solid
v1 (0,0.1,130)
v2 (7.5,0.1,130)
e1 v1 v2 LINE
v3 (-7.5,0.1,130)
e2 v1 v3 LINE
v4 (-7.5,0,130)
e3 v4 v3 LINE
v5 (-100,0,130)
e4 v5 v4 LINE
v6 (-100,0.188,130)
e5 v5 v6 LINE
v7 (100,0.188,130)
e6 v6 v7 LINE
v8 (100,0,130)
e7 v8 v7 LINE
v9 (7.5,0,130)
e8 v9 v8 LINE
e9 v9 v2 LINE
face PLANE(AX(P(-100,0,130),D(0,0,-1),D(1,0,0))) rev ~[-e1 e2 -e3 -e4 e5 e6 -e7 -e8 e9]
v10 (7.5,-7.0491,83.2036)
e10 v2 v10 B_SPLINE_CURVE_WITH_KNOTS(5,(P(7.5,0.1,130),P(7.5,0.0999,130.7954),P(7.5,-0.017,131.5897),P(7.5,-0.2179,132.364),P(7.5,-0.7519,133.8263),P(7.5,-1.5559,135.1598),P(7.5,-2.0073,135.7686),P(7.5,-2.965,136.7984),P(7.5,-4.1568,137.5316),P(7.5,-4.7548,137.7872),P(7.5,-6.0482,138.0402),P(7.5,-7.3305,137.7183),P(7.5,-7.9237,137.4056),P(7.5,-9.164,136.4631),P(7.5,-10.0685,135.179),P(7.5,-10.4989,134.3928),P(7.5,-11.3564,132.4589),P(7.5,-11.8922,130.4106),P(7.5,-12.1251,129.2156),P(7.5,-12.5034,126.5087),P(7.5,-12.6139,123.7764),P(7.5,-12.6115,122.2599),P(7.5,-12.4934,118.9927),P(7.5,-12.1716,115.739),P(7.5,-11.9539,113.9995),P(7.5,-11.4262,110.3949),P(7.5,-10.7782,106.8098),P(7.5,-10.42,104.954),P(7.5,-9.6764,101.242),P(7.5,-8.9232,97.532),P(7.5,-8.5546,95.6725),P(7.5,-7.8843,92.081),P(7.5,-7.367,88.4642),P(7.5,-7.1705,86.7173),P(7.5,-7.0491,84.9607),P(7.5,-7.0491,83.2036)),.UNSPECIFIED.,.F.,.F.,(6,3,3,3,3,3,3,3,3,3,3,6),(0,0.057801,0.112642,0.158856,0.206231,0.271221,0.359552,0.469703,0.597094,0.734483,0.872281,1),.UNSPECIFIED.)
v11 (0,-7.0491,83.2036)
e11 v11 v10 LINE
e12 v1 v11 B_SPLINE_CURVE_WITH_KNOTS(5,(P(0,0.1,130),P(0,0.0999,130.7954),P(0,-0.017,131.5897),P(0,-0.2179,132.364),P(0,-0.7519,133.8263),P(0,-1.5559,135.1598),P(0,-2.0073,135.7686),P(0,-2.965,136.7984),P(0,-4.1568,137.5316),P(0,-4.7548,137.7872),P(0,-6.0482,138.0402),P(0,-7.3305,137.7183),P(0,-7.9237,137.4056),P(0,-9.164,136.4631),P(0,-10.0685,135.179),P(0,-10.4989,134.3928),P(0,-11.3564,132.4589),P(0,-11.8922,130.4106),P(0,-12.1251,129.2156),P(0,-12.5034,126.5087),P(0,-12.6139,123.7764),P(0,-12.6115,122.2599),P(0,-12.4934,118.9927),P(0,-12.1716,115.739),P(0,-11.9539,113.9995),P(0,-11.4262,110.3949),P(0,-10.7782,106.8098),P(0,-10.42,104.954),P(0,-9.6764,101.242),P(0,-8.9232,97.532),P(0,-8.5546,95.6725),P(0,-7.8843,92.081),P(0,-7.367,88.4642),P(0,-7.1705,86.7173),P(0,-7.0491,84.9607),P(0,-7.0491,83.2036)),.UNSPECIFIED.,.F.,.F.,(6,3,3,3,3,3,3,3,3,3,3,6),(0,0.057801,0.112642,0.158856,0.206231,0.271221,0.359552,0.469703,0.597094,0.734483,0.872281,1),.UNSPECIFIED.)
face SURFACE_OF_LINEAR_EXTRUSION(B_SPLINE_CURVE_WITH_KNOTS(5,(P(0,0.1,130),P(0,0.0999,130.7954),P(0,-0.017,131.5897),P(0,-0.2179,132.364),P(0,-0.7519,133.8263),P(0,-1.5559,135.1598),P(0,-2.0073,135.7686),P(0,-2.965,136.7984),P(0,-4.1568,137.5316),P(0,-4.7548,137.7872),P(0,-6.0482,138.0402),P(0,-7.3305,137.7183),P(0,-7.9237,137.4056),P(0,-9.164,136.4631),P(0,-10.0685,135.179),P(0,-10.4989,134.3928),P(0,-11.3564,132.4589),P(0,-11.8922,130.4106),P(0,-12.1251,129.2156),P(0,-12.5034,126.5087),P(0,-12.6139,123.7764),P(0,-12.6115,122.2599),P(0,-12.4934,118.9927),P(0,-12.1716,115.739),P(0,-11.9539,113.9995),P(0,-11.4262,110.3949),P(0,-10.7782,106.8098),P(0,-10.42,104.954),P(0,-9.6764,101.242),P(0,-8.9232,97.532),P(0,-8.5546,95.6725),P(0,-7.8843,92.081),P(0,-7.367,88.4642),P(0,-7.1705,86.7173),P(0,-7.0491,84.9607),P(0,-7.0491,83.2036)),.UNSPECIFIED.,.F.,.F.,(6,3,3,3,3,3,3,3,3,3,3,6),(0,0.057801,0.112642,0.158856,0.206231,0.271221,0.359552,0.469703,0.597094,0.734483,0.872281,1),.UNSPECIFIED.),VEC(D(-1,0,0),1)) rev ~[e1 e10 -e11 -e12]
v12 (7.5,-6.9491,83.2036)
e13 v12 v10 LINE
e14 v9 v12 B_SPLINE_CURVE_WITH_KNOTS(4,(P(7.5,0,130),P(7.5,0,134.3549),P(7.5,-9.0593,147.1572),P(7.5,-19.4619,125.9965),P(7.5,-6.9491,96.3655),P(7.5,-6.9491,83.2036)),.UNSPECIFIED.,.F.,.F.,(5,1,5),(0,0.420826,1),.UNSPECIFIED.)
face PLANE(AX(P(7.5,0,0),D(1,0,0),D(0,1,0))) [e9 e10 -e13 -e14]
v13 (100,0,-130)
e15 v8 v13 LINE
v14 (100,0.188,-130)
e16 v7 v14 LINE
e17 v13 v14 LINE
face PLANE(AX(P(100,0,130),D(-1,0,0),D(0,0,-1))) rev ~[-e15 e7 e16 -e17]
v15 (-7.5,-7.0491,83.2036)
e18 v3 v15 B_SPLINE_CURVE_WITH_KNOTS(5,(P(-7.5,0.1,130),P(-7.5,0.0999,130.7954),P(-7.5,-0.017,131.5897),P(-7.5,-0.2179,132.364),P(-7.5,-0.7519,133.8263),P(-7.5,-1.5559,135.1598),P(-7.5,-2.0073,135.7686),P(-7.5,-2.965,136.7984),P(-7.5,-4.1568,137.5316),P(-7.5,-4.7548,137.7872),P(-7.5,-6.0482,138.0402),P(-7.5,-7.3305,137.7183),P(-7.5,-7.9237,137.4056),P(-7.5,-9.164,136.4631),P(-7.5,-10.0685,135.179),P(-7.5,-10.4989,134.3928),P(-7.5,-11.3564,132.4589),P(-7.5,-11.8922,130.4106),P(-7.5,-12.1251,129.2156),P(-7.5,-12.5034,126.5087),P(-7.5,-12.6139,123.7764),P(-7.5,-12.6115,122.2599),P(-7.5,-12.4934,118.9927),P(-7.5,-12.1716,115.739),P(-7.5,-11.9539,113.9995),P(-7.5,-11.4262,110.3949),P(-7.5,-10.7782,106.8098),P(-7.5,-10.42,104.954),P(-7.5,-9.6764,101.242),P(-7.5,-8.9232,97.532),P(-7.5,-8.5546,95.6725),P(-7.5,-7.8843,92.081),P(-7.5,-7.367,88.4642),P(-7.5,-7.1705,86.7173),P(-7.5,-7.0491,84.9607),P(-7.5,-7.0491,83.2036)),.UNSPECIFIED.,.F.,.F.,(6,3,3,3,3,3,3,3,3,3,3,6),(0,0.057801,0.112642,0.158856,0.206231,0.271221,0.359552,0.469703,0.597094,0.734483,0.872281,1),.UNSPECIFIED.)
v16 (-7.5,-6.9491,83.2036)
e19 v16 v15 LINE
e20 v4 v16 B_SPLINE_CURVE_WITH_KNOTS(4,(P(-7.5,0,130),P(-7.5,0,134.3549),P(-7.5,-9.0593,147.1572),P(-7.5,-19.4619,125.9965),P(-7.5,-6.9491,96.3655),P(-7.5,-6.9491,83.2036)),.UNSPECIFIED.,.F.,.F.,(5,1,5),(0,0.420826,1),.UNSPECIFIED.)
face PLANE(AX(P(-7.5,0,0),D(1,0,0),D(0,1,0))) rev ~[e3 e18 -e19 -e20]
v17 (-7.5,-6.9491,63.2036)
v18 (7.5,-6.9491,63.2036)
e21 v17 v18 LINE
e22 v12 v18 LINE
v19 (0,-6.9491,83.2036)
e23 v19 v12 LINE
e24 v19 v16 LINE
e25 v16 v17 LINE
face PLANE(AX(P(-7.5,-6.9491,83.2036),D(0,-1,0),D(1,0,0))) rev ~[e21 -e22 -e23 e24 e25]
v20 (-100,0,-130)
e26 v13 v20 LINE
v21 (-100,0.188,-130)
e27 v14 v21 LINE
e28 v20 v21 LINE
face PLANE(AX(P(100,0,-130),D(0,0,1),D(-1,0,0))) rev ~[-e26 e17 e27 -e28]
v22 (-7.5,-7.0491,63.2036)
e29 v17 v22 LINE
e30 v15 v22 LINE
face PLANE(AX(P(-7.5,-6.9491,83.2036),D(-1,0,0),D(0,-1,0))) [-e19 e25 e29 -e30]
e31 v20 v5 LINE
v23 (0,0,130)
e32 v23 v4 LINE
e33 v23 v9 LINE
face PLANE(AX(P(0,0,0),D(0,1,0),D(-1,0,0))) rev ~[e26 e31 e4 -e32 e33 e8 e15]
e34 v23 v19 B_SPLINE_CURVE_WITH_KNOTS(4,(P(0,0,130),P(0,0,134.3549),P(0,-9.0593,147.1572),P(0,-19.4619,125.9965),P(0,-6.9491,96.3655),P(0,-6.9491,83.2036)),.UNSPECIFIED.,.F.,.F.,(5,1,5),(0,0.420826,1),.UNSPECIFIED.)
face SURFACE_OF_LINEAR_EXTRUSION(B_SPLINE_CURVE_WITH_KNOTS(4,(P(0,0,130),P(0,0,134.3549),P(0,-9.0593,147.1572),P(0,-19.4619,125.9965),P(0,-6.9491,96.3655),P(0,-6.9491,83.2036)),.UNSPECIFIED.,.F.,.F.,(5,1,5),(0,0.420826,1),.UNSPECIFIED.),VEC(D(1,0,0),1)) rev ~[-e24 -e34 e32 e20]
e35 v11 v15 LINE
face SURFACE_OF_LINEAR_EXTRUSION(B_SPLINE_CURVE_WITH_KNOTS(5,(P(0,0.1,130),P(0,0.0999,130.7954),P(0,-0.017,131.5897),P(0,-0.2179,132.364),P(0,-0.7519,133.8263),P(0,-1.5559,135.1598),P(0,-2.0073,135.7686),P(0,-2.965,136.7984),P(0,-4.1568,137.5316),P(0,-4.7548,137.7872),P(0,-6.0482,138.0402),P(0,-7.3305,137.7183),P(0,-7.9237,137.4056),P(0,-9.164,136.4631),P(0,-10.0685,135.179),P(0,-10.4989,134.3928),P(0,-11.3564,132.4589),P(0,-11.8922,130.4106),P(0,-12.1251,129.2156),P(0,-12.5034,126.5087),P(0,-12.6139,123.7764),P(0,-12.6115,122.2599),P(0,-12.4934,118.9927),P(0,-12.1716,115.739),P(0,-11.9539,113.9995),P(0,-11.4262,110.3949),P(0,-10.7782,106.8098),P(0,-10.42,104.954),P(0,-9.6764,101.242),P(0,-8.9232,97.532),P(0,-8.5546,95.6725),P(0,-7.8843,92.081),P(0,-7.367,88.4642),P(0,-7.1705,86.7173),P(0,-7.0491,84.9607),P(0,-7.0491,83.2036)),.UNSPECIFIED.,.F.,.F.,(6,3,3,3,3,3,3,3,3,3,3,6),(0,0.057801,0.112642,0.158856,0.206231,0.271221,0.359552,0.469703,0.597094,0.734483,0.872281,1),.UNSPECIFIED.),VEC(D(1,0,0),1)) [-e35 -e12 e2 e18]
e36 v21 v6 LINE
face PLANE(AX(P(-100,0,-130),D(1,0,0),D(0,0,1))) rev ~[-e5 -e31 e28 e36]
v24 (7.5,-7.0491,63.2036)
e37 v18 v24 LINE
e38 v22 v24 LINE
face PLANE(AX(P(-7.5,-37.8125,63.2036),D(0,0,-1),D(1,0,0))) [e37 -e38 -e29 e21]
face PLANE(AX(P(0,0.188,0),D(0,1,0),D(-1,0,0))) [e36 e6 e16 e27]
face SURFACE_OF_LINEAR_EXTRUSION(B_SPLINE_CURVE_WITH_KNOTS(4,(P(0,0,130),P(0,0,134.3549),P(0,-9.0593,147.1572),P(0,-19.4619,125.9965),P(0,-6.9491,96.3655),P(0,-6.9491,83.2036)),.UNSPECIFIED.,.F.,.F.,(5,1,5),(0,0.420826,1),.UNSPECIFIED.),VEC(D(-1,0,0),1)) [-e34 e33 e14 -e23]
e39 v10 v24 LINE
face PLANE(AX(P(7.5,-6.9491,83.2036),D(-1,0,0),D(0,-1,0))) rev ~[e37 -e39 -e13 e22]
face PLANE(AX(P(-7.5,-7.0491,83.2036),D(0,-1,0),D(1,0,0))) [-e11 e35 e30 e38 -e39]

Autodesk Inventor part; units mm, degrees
ref_plane "YZ Plane" through (0, 0, 0) normal (1, 0, 0) x (0, 1, 0)
ref_plane "XZ Plane" through (0, 0, 0) normal (0, 1, 0) x (-1, 0, 0)
sketch "Sketch1" plane through (0, 0, 0) normal (0, 1, 0) x (-1, 0, 0)
  line L0 (100, 130) -> (-100, 130)
  line L1 (-100, 130) -> (-100, -130)
  line L2 (-100, -130) -> (100, -130)
  line L3 (100, -130) -> (100, 130)
  line L4 (100, 130) -> (-100, -130) construction
  line L5 (-100, 130) -> (100, -130) construction
  point P0 (0, 0)
  dimension "d0" = 200
  dimension "d1" = 260
extrude "Extrusion1" add sketch "Sketch1" along normal blind 0.188
sketch "Sketch10" plane through (0, 0.188, 0) normal (0, 1, 0) x (1, 0, 0)
  line L0 (98.0274, 130) -> (98.0274, -130) construction
  line L1 (98.0274, -130) -> (-100, -130) construction
  line L2 (-100, -130) -> (-100, 130) construction
  line L3 (-100, 130) -> (98.0274, 130) construction
  point P0 (0, 0)
decal "Decal6"
sketch "Sketch9" plane through (0, 0.188, 0) normal (0, 1, 0) x (1, 0, 0)
  line L0 (-9.9844, -128.5553) -> (-9.9844, -122.1467) construction
  line L1 (-9.9844, -122.1467) -> (9.7409, -122.1467) construction
  line L2 (9.7409, -122.1467) -> (9.7409, -128.5553) construction
  line L3 (9.7409, -128.5553) -> (-9.9844, -128.5553) construction
  point P0 (0, 0)
decal "Decal5"
sketch "Sketch2" plane through (0, 0, 0) normal (1, 0, 0) x (0, 1, 0)
  line L0 (0.188, 130) -> (0.188, -130) projected
  line L1 (0, 90.3171) -> (0, 130) construction
  spline S0 degree 4 poles (0, 130) (0, 134.3549) (-9.0593, 147.1572) (-19.4619, 125.9965) (-6.9491, 96.3655) (-6.9491, 83.2036) knots 0 0 0 0 0 0.420826 1 1 1 1 1
  line L2 (0, 130) -> (0, 216.7) construction
  line L3 (-6.9491, 83.2036) -> (-6.9491, 68.2036) construction
  point P0 (0, 0)
  point P1 (-4.7518, 137.6005)
  point P2 (-10.9891, 132.9269)
  dimension "d4" = 86.7
  dimension "d10" = 15
sketch "Sketch3" plane through (0, 0, 0) normal (1, 0, 0) x (0, 1, 0)
  spline S0 degree 4 poles (0, 130) (0, 134.3549) (-9.0593, 147.1572) (-19.4619, 125.9965) (-6.9491, 96.3655) (-6.9491, 83.2036) knots 0 0 0 0 0 0.420826 1 1 1 1 1 projected
  line L0 (0, 130) -> (0, -130) projected
  line L1 (0, 130) -> (0.1, 130)
  line L2 (0, 130) -> (0.188, 130) projected
  line L3 (-6.9491, 83.2036) -> (-7.0491, 83.2036)
  spline S1 degree 5 poles (0.1, 130) (0.0999, 130.7954) (-0.017, 131.5897) (-0.2179, 132.364) (-0.7519, 133.8263) (-1.5559, 135.1598) (-2.0073, 135.7686) (-2.965, 136.7984) (-4.1568, 137.5316) (-4.7548, 137.7872) (-6.0482, 138.0402) (-7.3305, 137.7183) (-7.9237, 137.4056) (-9.164, 136.4631) (-10.0685, 135.179) (-10.4989, 134.3928) (-11.3564, 132.4589) (-11.8922, 130.4106) (-12.1251, 129.2156) (-12.5034, 126.5087) (-12.6139, 123.7764) (-12.6115, 122.2599) (-12.4934, 118.9927) (-12.1716, 115.739) (-11.9539, 113.9995) (-11.4262, 110.3949) (-10.7782, 106.8098) (-10.42, 104.954) (-9.6764, 101.242) (-8.9232, 97.532) (-8.5546, 95.6725) (-7.8843, 92.081) (-7.367, 88.4642) (-7.1705, 86.7173) (-7.0491, 84.9607) (-7.0491, 83.2036) knots 0 0 0 0 0 0 0.057801 0.057801 0.057801 0.112642 0.112642 0.112642 0.158856 0.158856 0.158856 0.206231 0.206231 0.206231 0.271221 0.271221 0.271221 0.359552 0.359552 0.359552 0.469703 0.469703 0.469703 0.597094 0.597094 0.597094 0.734483 0.734483 0.734483 0.872281 0.872281 0.872281 1 1 1 1 1 1
  point P0 (0, 0)
  dimension "d5" = 0.1
extrude "Extrusion2" add sketch "Sketch3" along normal mid plane 15
sketch "Sketch4" plane through (-7.5, -37.8125, 83.2036) normal (0, 0, -1) x (1, 0, 0)
  line L0 (0, -30.8634) -> (0, -30.7634) projected
  line L1 (0, -30.7634) -> (15, -30.7634) projected
  line L2 (0, -30.8634) -> (15, -30.8634)
  line L3 (15, -30.8634) -> (15, -30.7634)
  line L4 (15, -30.7634) -> (0, -30.7634)
  line L5 (0, -30.7634) -> (0, -30.8634)
  point P0 (7.5, -37.8125)
extrude "Extrusion3" add sketch "Sketch4" along normal blind 20
sketch "Sketch11" plane through (0, 0, 0) normal (0, -1, 0) x (1, 0, 0)
  line L0 (-98.7516, -130.9508) -> (-100, 130) construction
  line L1 (-100, 130) -> (98.7516, 130.9508) construction
  line L2 (98.7516, 130.9508) -> (100, -130) construction
  line L3 (100, -130) -> (-98.7516, -130.9508) construction
  point P0 (0, 0)
decal "Decal7"
sketch "Sketch5" plane through (0, 0.188, 0) normal (0, 1, 0) x (1, 0, 0)
  line L0 (7.5, -44.1487) -> (7.5, -140.6515) construction
  line L1 (7.5, -140.6515) -> (-7.5, -140.6515) construction
  line L2 (-7.5, -140.6515) -> (-7.5, -44.1487) construction
  line L3 (-7.5, -44.1487) -> (7.5, -44.1487) construction
  point P0 (0, 0)
  point P1 (7.5, -130)
  point P2 (-7.5, -130)
decal "Decal1"
sketch "Sketch6" plane through (-7.5, -7.0491, 83.2036) normal (0, -1, 0) x (1, 0, 0)
  line L0 (0.0146, -20.011) -> (0, 0) construction
  line L1 (0, 0) -> (14.9854, 0.011) construction
  line L2 (14.9854, 0.011) -> (15, -20) construction
  line L3 (15, -20) -> (0.0146, -20.011) construction
  point P0 (7.5, -83.2036)
  point P1 (15, -20)
decal "Decal2"
sketch "Sketch7" plane through (7.5, -6.9491, 83.2036) normal (0, 1, 0) x (-1, 0, 0)
  line L0 (0.0146, -20.011) -> (0, 0) construction
  line L1 (0, 0) -> (14.9854, 0.011) construction
  line L2 (14.9854, 0.011) -> (15, -20) construction
  line L3 (15, -20) -> (0.0146, -20.011) construction
  point P0 (7.5, -83.2036)
  point P1 (15, -20)
decal "Decal3"
sketch "Sketch8" plane through (0, 0, 0) normal (0, -1, 0) x (1, 0, 0)
  line L0 (7.5, 207.6879) -> (7.5, 130) construction
  line L1 (7.5, 130) -> (-7.5, 130) construction
  line L2 (-7.5, 130) -> (-7.5, 207.6879) construction
  line L3 (-7.5, 207.6879) -> (7.5, 207.6879) construction
  point P0 (0, 0)
decal "Decal4"
sketch "Sketch12" plane through (0, 0, 0) normal (1, 0, 0) x (0, 1, 0)
  line L0 (-36.5283, 83.3447) -> (-6.2422, 162.4124)
  line L1 (-36.5283, 83.3447) -> (-63.1781, 93.5527)
  point P0 (0, 0)
ref_plane "Work Plane1" through (0, -36.5283, 83.3447) normal (0, -0.9338373, 0.3576979) x (1, 0, 0)
sketch "Sketch13" plane through (0, -36.5283, 83.3447) normal (0, -0.9338373, 0.3576979) x (1, 0, 0)
  line L0 (7.5, 88.1007) -> (7.5, 10.4128) construction
  line L1 (7.5, 10.4128) -> (-7.5, 10.4128) construction
  line L2 (-7.5, 10.4128) -> (-7.5, 88.1007) construction
  line L3 (-7.5, 88.1007) -> (7.5, 88.1007) construction
  point P0 (0, -64.7643)
decal "Decal8"
properties part number "12inch Touchscreen" material "Glass"
